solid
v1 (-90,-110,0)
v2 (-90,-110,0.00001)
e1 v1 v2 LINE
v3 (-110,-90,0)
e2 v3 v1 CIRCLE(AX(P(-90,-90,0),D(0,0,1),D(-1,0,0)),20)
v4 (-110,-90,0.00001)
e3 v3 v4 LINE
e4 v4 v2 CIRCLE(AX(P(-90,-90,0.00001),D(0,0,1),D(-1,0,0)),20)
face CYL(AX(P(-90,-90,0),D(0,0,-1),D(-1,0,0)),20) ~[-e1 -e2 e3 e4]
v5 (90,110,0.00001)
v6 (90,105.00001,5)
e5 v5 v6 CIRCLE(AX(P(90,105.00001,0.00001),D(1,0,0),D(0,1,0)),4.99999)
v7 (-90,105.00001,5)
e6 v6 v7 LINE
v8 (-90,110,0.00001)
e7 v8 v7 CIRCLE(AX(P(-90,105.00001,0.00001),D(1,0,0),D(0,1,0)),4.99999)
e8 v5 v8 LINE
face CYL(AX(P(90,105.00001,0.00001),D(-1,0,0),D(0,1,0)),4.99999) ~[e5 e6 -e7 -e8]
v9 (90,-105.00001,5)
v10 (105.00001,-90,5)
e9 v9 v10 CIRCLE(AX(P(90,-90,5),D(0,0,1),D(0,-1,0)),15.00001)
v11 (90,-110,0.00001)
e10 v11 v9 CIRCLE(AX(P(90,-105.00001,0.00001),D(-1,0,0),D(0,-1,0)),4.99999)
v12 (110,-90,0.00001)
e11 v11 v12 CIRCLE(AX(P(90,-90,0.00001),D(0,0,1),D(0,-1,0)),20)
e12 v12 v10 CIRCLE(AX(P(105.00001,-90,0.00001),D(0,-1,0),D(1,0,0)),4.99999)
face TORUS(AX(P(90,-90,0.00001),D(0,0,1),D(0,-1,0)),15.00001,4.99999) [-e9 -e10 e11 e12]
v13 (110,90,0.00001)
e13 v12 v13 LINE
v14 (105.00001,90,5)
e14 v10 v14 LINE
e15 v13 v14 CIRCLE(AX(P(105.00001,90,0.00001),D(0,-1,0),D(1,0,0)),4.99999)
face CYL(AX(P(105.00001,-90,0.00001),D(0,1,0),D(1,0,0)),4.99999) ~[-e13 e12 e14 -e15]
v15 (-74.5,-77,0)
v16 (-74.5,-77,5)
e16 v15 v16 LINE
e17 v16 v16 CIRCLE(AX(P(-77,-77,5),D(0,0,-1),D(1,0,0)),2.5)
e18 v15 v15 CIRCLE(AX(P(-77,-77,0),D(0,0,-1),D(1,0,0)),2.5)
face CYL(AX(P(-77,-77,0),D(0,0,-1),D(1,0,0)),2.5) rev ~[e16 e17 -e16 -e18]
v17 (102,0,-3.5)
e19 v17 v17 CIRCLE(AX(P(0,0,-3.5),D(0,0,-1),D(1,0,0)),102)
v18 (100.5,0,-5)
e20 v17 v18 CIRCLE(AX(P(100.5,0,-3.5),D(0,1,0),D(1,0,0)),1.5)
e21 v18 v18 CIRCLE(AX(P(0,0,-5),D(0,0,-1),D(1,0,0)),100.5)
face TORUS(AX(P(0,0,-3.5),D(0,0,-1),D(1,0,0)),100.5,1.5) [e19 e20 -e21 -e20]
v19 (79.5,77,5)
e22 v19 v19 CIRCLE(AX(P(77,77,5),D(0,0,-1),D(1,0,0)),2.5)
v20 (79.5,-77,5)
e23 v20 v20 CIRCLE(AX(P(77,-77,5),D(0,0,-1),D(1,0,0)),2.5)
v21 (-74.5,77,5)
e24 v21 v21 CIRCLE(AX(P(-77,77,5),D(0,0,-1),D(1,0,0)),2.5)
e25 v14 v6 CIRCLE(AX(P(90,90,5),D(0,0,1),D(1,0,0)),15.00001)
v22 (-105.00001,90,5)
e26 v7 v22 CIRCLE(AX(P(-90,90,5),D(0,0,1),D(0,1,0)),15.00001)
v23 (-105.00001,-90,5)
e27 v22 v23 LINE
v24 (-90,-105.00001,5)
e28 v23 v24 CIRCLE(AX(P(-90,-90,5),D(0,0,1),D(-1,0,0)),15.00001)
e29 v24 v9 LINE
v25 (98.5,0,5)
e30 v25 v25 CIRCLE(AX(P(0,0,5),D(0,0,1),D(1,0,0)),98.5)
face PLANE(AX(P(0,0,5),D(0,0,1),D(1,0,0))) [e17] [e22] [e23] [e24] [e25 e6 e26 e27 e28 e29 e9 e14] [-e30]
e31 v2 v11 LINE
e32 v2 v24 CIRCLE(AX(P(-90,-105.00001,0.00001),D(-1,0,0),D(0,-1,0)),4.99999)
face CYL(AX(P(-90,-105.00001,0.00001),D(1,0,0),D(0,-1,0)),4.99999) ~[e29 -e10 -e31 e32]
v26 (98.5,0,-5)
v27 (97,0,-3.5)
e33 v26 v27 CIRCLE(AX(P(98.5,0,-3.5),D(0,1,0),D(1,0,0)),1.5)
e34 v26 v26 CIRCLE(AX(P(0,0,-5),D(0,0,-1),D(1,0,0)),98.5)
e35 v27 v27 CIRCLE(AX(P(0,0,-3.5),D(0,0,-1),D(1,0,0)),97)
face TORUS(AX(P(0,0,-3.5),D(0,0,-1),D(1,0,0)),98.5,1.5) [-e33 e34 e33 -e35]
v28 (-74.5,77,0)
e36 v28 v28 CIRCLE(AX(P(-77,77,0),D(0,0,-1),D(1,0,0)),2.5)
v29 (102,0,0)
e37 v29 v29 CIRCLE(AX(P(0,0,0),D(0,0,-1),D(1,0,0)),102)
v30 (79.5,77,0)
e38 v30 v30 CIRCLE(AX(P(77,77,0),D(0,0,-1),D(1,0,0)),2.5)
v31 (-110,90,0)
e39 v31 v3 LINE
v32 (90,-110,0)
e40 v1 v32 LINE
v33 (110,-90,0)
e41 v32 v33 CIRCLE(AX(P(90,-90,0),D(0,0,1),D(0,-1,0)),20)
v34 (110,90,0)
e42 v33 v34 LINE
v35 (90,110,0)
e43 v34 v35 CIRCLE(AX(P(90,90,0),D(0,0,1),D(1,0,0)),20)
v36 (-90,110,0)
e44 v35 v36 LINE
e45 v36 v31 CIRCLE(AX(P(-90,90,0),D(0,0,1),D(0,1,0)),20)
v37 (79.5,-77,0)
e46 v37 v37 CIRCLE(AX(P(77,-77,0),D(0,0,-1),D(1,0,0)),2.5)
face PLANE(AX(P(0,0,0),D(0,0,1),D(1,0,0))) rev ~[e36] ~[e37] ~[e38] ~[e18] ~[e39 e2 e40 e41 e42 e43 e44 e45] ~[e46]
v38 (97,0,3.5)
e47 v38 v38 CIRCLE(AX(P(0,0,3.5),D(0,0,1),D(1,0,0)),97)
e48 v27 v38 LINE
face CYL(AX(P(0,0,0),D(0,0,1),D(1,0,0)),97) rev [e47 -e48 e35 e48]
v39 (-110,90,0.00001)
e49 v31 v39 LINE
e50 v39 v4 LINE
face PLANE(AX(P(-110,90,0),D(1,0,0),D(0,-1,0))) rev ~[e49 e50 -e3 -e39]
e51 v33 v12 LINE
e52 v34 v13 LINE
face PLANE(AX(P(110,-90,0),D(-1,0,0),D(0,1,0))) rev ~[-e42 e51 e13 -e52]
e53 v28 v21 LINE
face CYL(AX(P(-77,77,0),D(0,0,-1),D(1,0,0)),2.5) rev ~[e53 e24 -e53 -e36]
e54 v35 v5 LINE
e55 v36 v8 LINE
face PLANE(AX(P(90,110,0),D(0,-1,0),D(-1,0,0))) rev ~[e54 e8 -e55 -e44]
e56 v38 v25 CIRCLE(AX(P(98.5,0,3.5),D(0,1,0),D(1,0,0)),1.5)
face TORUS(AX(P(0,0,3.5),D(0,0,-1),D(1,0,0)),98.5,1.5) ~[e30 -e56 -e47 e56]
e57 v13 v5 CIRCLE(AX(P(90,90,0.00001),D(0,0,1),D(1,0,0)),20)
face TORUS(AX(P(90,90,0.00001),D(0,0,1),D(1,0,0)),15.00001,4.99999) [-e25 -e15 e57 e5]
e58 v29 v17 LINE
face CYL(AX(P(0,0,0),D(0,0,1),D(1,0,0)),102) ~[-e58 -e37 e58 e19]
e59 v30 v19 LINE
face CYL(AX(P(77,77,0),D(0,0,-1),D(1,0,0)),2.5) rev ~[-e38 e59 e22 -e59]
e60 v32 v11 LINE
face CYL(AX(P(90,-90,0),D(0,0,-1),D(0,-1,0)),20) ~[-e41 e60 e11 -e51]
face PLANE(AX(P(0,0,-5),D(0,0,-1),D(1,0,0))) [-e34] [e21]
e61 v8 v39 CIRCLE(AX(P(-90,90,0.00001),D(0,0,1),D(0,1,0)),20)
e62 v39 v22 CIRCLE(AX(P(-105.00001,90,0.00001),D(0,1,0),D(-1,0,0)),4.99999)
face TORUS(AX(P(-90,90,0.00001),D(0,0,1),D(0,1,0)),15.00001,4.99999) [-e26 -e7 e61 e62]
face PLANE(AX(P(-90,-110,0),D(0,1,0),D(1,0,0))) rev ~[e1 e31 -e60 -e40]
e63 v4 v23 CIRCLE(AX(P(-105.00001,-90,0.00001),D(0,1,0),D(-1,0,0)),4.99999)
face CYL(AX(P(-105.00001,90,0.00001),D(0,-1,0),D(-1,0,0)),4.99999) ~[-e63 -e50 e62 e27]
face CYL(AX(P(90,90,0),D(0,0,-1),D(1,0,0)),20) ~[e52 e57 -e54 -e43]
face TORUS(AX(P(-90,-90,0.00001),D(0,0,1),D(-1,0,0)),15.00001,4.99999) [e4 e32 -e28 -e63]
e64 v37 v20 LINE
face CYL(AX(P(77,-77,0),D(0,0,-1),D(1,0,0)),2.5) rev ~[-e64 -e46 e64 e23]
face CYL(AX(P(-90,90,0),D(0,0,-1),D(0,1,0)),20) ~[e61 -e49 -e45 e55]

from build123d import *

# Parameters (mm, degrees)
F0_R     = 97
F1_DEPTH = 5
F3_R     = 102
F3_R_2   = 97
F4_DEPTH = 5
F5_R     = 1.5
F6_R     = 4.99999
F2_R     = 2.5
F7_DEPTH = 5


# Not quite as in the source:
# - a fillet or chamfer is up to 0.001 mm smaller than in the source, because OpenCascade refuses the exact size


with BuildPart() as f1:
    # F0 (on Top) → F1 (new body)
    with BuildSketch(Plane.XY):
        with BuildLine():
            Line((-90, -110), (90, -110))
            ThreePointArc((90, -110), (104.1421356237, -104.1421356237), (110, -90))
            Line((110, -90), (110, 90))
            ThreePointArc((110, 90), (104.1421356237, 104.1421356237), (90, 110))
            Line((90, 110), (-90, 110))
            ThreePointArc((-90, 110), (-104.1421356237, 104.1421356237), (-110, 90))
            Line((-110, 90), (-110, -90))
            ThreePointArc((-110, -90), (-104.1421356237, -104.1421356237), (-90, -110))
        make_face()
        Circle(F0_R, mode=Mode.SUBTRACT)
    extrude(amount=F1_DEPTH)

    # F3 (on face) → F4 (join)
    with BuildSketch(Plane(origin=(0, 0, 0), x_dir=(1, 0, 0), z_dir=(0, 0, -1))):
        Circle(F3_R)
        Circle(F3_R_2, mode=Mode.SUBTRACT)
    extrude(amount=F4_DEPTH)

    # F5
    f5_edges = [f1.edges().sort_by_distance(p)[0] for p in [
        (-97, 0, -5),
        (-102, 0, -5),
        (-97, 0, 5),
    ]]
    fillet(f5_edges, radius=F5_R)

    # F6 (radius 5 in the source; OpenCascade refuses exactly that, so slightly less here)
    f6_edges = [f1.edges().sort_by_distance(p)[0] for p in [
        (-98.5, 0, 5),
        (0, -110, 5),
        (104.142136, -104.142136, 5),
        (110, 0, 5),
        (104.142136, 104.142136, 5),
        (0, 110, 5),
        (-104.142136, 104.142136, 5),
        (-110, 0, 5),
        (-104.142136, -104.142136, 5),
    ]]
    fillet(f6_edges, radius=F6_R)

    # F2 (on face) → F7 (cut, through all)
    with BuildSketch(Plane(origin=(0, 0, 0), x_dir=(1, 0, 0), z_dir=(0, 0, -1))):
        with Locations((-77, 77)):
            Circle(F2_R)
        with Locations((77, 77)):
            Circle(F2_R)
        with Locations((77, -77)):
            Circle(F2_R)
        with Locations((-77, -77)):
            Circle(F2_R)
    extrude(amount=-F7_DEPTH, mode=Mode.SUBTRACT)


solid = f1.part
